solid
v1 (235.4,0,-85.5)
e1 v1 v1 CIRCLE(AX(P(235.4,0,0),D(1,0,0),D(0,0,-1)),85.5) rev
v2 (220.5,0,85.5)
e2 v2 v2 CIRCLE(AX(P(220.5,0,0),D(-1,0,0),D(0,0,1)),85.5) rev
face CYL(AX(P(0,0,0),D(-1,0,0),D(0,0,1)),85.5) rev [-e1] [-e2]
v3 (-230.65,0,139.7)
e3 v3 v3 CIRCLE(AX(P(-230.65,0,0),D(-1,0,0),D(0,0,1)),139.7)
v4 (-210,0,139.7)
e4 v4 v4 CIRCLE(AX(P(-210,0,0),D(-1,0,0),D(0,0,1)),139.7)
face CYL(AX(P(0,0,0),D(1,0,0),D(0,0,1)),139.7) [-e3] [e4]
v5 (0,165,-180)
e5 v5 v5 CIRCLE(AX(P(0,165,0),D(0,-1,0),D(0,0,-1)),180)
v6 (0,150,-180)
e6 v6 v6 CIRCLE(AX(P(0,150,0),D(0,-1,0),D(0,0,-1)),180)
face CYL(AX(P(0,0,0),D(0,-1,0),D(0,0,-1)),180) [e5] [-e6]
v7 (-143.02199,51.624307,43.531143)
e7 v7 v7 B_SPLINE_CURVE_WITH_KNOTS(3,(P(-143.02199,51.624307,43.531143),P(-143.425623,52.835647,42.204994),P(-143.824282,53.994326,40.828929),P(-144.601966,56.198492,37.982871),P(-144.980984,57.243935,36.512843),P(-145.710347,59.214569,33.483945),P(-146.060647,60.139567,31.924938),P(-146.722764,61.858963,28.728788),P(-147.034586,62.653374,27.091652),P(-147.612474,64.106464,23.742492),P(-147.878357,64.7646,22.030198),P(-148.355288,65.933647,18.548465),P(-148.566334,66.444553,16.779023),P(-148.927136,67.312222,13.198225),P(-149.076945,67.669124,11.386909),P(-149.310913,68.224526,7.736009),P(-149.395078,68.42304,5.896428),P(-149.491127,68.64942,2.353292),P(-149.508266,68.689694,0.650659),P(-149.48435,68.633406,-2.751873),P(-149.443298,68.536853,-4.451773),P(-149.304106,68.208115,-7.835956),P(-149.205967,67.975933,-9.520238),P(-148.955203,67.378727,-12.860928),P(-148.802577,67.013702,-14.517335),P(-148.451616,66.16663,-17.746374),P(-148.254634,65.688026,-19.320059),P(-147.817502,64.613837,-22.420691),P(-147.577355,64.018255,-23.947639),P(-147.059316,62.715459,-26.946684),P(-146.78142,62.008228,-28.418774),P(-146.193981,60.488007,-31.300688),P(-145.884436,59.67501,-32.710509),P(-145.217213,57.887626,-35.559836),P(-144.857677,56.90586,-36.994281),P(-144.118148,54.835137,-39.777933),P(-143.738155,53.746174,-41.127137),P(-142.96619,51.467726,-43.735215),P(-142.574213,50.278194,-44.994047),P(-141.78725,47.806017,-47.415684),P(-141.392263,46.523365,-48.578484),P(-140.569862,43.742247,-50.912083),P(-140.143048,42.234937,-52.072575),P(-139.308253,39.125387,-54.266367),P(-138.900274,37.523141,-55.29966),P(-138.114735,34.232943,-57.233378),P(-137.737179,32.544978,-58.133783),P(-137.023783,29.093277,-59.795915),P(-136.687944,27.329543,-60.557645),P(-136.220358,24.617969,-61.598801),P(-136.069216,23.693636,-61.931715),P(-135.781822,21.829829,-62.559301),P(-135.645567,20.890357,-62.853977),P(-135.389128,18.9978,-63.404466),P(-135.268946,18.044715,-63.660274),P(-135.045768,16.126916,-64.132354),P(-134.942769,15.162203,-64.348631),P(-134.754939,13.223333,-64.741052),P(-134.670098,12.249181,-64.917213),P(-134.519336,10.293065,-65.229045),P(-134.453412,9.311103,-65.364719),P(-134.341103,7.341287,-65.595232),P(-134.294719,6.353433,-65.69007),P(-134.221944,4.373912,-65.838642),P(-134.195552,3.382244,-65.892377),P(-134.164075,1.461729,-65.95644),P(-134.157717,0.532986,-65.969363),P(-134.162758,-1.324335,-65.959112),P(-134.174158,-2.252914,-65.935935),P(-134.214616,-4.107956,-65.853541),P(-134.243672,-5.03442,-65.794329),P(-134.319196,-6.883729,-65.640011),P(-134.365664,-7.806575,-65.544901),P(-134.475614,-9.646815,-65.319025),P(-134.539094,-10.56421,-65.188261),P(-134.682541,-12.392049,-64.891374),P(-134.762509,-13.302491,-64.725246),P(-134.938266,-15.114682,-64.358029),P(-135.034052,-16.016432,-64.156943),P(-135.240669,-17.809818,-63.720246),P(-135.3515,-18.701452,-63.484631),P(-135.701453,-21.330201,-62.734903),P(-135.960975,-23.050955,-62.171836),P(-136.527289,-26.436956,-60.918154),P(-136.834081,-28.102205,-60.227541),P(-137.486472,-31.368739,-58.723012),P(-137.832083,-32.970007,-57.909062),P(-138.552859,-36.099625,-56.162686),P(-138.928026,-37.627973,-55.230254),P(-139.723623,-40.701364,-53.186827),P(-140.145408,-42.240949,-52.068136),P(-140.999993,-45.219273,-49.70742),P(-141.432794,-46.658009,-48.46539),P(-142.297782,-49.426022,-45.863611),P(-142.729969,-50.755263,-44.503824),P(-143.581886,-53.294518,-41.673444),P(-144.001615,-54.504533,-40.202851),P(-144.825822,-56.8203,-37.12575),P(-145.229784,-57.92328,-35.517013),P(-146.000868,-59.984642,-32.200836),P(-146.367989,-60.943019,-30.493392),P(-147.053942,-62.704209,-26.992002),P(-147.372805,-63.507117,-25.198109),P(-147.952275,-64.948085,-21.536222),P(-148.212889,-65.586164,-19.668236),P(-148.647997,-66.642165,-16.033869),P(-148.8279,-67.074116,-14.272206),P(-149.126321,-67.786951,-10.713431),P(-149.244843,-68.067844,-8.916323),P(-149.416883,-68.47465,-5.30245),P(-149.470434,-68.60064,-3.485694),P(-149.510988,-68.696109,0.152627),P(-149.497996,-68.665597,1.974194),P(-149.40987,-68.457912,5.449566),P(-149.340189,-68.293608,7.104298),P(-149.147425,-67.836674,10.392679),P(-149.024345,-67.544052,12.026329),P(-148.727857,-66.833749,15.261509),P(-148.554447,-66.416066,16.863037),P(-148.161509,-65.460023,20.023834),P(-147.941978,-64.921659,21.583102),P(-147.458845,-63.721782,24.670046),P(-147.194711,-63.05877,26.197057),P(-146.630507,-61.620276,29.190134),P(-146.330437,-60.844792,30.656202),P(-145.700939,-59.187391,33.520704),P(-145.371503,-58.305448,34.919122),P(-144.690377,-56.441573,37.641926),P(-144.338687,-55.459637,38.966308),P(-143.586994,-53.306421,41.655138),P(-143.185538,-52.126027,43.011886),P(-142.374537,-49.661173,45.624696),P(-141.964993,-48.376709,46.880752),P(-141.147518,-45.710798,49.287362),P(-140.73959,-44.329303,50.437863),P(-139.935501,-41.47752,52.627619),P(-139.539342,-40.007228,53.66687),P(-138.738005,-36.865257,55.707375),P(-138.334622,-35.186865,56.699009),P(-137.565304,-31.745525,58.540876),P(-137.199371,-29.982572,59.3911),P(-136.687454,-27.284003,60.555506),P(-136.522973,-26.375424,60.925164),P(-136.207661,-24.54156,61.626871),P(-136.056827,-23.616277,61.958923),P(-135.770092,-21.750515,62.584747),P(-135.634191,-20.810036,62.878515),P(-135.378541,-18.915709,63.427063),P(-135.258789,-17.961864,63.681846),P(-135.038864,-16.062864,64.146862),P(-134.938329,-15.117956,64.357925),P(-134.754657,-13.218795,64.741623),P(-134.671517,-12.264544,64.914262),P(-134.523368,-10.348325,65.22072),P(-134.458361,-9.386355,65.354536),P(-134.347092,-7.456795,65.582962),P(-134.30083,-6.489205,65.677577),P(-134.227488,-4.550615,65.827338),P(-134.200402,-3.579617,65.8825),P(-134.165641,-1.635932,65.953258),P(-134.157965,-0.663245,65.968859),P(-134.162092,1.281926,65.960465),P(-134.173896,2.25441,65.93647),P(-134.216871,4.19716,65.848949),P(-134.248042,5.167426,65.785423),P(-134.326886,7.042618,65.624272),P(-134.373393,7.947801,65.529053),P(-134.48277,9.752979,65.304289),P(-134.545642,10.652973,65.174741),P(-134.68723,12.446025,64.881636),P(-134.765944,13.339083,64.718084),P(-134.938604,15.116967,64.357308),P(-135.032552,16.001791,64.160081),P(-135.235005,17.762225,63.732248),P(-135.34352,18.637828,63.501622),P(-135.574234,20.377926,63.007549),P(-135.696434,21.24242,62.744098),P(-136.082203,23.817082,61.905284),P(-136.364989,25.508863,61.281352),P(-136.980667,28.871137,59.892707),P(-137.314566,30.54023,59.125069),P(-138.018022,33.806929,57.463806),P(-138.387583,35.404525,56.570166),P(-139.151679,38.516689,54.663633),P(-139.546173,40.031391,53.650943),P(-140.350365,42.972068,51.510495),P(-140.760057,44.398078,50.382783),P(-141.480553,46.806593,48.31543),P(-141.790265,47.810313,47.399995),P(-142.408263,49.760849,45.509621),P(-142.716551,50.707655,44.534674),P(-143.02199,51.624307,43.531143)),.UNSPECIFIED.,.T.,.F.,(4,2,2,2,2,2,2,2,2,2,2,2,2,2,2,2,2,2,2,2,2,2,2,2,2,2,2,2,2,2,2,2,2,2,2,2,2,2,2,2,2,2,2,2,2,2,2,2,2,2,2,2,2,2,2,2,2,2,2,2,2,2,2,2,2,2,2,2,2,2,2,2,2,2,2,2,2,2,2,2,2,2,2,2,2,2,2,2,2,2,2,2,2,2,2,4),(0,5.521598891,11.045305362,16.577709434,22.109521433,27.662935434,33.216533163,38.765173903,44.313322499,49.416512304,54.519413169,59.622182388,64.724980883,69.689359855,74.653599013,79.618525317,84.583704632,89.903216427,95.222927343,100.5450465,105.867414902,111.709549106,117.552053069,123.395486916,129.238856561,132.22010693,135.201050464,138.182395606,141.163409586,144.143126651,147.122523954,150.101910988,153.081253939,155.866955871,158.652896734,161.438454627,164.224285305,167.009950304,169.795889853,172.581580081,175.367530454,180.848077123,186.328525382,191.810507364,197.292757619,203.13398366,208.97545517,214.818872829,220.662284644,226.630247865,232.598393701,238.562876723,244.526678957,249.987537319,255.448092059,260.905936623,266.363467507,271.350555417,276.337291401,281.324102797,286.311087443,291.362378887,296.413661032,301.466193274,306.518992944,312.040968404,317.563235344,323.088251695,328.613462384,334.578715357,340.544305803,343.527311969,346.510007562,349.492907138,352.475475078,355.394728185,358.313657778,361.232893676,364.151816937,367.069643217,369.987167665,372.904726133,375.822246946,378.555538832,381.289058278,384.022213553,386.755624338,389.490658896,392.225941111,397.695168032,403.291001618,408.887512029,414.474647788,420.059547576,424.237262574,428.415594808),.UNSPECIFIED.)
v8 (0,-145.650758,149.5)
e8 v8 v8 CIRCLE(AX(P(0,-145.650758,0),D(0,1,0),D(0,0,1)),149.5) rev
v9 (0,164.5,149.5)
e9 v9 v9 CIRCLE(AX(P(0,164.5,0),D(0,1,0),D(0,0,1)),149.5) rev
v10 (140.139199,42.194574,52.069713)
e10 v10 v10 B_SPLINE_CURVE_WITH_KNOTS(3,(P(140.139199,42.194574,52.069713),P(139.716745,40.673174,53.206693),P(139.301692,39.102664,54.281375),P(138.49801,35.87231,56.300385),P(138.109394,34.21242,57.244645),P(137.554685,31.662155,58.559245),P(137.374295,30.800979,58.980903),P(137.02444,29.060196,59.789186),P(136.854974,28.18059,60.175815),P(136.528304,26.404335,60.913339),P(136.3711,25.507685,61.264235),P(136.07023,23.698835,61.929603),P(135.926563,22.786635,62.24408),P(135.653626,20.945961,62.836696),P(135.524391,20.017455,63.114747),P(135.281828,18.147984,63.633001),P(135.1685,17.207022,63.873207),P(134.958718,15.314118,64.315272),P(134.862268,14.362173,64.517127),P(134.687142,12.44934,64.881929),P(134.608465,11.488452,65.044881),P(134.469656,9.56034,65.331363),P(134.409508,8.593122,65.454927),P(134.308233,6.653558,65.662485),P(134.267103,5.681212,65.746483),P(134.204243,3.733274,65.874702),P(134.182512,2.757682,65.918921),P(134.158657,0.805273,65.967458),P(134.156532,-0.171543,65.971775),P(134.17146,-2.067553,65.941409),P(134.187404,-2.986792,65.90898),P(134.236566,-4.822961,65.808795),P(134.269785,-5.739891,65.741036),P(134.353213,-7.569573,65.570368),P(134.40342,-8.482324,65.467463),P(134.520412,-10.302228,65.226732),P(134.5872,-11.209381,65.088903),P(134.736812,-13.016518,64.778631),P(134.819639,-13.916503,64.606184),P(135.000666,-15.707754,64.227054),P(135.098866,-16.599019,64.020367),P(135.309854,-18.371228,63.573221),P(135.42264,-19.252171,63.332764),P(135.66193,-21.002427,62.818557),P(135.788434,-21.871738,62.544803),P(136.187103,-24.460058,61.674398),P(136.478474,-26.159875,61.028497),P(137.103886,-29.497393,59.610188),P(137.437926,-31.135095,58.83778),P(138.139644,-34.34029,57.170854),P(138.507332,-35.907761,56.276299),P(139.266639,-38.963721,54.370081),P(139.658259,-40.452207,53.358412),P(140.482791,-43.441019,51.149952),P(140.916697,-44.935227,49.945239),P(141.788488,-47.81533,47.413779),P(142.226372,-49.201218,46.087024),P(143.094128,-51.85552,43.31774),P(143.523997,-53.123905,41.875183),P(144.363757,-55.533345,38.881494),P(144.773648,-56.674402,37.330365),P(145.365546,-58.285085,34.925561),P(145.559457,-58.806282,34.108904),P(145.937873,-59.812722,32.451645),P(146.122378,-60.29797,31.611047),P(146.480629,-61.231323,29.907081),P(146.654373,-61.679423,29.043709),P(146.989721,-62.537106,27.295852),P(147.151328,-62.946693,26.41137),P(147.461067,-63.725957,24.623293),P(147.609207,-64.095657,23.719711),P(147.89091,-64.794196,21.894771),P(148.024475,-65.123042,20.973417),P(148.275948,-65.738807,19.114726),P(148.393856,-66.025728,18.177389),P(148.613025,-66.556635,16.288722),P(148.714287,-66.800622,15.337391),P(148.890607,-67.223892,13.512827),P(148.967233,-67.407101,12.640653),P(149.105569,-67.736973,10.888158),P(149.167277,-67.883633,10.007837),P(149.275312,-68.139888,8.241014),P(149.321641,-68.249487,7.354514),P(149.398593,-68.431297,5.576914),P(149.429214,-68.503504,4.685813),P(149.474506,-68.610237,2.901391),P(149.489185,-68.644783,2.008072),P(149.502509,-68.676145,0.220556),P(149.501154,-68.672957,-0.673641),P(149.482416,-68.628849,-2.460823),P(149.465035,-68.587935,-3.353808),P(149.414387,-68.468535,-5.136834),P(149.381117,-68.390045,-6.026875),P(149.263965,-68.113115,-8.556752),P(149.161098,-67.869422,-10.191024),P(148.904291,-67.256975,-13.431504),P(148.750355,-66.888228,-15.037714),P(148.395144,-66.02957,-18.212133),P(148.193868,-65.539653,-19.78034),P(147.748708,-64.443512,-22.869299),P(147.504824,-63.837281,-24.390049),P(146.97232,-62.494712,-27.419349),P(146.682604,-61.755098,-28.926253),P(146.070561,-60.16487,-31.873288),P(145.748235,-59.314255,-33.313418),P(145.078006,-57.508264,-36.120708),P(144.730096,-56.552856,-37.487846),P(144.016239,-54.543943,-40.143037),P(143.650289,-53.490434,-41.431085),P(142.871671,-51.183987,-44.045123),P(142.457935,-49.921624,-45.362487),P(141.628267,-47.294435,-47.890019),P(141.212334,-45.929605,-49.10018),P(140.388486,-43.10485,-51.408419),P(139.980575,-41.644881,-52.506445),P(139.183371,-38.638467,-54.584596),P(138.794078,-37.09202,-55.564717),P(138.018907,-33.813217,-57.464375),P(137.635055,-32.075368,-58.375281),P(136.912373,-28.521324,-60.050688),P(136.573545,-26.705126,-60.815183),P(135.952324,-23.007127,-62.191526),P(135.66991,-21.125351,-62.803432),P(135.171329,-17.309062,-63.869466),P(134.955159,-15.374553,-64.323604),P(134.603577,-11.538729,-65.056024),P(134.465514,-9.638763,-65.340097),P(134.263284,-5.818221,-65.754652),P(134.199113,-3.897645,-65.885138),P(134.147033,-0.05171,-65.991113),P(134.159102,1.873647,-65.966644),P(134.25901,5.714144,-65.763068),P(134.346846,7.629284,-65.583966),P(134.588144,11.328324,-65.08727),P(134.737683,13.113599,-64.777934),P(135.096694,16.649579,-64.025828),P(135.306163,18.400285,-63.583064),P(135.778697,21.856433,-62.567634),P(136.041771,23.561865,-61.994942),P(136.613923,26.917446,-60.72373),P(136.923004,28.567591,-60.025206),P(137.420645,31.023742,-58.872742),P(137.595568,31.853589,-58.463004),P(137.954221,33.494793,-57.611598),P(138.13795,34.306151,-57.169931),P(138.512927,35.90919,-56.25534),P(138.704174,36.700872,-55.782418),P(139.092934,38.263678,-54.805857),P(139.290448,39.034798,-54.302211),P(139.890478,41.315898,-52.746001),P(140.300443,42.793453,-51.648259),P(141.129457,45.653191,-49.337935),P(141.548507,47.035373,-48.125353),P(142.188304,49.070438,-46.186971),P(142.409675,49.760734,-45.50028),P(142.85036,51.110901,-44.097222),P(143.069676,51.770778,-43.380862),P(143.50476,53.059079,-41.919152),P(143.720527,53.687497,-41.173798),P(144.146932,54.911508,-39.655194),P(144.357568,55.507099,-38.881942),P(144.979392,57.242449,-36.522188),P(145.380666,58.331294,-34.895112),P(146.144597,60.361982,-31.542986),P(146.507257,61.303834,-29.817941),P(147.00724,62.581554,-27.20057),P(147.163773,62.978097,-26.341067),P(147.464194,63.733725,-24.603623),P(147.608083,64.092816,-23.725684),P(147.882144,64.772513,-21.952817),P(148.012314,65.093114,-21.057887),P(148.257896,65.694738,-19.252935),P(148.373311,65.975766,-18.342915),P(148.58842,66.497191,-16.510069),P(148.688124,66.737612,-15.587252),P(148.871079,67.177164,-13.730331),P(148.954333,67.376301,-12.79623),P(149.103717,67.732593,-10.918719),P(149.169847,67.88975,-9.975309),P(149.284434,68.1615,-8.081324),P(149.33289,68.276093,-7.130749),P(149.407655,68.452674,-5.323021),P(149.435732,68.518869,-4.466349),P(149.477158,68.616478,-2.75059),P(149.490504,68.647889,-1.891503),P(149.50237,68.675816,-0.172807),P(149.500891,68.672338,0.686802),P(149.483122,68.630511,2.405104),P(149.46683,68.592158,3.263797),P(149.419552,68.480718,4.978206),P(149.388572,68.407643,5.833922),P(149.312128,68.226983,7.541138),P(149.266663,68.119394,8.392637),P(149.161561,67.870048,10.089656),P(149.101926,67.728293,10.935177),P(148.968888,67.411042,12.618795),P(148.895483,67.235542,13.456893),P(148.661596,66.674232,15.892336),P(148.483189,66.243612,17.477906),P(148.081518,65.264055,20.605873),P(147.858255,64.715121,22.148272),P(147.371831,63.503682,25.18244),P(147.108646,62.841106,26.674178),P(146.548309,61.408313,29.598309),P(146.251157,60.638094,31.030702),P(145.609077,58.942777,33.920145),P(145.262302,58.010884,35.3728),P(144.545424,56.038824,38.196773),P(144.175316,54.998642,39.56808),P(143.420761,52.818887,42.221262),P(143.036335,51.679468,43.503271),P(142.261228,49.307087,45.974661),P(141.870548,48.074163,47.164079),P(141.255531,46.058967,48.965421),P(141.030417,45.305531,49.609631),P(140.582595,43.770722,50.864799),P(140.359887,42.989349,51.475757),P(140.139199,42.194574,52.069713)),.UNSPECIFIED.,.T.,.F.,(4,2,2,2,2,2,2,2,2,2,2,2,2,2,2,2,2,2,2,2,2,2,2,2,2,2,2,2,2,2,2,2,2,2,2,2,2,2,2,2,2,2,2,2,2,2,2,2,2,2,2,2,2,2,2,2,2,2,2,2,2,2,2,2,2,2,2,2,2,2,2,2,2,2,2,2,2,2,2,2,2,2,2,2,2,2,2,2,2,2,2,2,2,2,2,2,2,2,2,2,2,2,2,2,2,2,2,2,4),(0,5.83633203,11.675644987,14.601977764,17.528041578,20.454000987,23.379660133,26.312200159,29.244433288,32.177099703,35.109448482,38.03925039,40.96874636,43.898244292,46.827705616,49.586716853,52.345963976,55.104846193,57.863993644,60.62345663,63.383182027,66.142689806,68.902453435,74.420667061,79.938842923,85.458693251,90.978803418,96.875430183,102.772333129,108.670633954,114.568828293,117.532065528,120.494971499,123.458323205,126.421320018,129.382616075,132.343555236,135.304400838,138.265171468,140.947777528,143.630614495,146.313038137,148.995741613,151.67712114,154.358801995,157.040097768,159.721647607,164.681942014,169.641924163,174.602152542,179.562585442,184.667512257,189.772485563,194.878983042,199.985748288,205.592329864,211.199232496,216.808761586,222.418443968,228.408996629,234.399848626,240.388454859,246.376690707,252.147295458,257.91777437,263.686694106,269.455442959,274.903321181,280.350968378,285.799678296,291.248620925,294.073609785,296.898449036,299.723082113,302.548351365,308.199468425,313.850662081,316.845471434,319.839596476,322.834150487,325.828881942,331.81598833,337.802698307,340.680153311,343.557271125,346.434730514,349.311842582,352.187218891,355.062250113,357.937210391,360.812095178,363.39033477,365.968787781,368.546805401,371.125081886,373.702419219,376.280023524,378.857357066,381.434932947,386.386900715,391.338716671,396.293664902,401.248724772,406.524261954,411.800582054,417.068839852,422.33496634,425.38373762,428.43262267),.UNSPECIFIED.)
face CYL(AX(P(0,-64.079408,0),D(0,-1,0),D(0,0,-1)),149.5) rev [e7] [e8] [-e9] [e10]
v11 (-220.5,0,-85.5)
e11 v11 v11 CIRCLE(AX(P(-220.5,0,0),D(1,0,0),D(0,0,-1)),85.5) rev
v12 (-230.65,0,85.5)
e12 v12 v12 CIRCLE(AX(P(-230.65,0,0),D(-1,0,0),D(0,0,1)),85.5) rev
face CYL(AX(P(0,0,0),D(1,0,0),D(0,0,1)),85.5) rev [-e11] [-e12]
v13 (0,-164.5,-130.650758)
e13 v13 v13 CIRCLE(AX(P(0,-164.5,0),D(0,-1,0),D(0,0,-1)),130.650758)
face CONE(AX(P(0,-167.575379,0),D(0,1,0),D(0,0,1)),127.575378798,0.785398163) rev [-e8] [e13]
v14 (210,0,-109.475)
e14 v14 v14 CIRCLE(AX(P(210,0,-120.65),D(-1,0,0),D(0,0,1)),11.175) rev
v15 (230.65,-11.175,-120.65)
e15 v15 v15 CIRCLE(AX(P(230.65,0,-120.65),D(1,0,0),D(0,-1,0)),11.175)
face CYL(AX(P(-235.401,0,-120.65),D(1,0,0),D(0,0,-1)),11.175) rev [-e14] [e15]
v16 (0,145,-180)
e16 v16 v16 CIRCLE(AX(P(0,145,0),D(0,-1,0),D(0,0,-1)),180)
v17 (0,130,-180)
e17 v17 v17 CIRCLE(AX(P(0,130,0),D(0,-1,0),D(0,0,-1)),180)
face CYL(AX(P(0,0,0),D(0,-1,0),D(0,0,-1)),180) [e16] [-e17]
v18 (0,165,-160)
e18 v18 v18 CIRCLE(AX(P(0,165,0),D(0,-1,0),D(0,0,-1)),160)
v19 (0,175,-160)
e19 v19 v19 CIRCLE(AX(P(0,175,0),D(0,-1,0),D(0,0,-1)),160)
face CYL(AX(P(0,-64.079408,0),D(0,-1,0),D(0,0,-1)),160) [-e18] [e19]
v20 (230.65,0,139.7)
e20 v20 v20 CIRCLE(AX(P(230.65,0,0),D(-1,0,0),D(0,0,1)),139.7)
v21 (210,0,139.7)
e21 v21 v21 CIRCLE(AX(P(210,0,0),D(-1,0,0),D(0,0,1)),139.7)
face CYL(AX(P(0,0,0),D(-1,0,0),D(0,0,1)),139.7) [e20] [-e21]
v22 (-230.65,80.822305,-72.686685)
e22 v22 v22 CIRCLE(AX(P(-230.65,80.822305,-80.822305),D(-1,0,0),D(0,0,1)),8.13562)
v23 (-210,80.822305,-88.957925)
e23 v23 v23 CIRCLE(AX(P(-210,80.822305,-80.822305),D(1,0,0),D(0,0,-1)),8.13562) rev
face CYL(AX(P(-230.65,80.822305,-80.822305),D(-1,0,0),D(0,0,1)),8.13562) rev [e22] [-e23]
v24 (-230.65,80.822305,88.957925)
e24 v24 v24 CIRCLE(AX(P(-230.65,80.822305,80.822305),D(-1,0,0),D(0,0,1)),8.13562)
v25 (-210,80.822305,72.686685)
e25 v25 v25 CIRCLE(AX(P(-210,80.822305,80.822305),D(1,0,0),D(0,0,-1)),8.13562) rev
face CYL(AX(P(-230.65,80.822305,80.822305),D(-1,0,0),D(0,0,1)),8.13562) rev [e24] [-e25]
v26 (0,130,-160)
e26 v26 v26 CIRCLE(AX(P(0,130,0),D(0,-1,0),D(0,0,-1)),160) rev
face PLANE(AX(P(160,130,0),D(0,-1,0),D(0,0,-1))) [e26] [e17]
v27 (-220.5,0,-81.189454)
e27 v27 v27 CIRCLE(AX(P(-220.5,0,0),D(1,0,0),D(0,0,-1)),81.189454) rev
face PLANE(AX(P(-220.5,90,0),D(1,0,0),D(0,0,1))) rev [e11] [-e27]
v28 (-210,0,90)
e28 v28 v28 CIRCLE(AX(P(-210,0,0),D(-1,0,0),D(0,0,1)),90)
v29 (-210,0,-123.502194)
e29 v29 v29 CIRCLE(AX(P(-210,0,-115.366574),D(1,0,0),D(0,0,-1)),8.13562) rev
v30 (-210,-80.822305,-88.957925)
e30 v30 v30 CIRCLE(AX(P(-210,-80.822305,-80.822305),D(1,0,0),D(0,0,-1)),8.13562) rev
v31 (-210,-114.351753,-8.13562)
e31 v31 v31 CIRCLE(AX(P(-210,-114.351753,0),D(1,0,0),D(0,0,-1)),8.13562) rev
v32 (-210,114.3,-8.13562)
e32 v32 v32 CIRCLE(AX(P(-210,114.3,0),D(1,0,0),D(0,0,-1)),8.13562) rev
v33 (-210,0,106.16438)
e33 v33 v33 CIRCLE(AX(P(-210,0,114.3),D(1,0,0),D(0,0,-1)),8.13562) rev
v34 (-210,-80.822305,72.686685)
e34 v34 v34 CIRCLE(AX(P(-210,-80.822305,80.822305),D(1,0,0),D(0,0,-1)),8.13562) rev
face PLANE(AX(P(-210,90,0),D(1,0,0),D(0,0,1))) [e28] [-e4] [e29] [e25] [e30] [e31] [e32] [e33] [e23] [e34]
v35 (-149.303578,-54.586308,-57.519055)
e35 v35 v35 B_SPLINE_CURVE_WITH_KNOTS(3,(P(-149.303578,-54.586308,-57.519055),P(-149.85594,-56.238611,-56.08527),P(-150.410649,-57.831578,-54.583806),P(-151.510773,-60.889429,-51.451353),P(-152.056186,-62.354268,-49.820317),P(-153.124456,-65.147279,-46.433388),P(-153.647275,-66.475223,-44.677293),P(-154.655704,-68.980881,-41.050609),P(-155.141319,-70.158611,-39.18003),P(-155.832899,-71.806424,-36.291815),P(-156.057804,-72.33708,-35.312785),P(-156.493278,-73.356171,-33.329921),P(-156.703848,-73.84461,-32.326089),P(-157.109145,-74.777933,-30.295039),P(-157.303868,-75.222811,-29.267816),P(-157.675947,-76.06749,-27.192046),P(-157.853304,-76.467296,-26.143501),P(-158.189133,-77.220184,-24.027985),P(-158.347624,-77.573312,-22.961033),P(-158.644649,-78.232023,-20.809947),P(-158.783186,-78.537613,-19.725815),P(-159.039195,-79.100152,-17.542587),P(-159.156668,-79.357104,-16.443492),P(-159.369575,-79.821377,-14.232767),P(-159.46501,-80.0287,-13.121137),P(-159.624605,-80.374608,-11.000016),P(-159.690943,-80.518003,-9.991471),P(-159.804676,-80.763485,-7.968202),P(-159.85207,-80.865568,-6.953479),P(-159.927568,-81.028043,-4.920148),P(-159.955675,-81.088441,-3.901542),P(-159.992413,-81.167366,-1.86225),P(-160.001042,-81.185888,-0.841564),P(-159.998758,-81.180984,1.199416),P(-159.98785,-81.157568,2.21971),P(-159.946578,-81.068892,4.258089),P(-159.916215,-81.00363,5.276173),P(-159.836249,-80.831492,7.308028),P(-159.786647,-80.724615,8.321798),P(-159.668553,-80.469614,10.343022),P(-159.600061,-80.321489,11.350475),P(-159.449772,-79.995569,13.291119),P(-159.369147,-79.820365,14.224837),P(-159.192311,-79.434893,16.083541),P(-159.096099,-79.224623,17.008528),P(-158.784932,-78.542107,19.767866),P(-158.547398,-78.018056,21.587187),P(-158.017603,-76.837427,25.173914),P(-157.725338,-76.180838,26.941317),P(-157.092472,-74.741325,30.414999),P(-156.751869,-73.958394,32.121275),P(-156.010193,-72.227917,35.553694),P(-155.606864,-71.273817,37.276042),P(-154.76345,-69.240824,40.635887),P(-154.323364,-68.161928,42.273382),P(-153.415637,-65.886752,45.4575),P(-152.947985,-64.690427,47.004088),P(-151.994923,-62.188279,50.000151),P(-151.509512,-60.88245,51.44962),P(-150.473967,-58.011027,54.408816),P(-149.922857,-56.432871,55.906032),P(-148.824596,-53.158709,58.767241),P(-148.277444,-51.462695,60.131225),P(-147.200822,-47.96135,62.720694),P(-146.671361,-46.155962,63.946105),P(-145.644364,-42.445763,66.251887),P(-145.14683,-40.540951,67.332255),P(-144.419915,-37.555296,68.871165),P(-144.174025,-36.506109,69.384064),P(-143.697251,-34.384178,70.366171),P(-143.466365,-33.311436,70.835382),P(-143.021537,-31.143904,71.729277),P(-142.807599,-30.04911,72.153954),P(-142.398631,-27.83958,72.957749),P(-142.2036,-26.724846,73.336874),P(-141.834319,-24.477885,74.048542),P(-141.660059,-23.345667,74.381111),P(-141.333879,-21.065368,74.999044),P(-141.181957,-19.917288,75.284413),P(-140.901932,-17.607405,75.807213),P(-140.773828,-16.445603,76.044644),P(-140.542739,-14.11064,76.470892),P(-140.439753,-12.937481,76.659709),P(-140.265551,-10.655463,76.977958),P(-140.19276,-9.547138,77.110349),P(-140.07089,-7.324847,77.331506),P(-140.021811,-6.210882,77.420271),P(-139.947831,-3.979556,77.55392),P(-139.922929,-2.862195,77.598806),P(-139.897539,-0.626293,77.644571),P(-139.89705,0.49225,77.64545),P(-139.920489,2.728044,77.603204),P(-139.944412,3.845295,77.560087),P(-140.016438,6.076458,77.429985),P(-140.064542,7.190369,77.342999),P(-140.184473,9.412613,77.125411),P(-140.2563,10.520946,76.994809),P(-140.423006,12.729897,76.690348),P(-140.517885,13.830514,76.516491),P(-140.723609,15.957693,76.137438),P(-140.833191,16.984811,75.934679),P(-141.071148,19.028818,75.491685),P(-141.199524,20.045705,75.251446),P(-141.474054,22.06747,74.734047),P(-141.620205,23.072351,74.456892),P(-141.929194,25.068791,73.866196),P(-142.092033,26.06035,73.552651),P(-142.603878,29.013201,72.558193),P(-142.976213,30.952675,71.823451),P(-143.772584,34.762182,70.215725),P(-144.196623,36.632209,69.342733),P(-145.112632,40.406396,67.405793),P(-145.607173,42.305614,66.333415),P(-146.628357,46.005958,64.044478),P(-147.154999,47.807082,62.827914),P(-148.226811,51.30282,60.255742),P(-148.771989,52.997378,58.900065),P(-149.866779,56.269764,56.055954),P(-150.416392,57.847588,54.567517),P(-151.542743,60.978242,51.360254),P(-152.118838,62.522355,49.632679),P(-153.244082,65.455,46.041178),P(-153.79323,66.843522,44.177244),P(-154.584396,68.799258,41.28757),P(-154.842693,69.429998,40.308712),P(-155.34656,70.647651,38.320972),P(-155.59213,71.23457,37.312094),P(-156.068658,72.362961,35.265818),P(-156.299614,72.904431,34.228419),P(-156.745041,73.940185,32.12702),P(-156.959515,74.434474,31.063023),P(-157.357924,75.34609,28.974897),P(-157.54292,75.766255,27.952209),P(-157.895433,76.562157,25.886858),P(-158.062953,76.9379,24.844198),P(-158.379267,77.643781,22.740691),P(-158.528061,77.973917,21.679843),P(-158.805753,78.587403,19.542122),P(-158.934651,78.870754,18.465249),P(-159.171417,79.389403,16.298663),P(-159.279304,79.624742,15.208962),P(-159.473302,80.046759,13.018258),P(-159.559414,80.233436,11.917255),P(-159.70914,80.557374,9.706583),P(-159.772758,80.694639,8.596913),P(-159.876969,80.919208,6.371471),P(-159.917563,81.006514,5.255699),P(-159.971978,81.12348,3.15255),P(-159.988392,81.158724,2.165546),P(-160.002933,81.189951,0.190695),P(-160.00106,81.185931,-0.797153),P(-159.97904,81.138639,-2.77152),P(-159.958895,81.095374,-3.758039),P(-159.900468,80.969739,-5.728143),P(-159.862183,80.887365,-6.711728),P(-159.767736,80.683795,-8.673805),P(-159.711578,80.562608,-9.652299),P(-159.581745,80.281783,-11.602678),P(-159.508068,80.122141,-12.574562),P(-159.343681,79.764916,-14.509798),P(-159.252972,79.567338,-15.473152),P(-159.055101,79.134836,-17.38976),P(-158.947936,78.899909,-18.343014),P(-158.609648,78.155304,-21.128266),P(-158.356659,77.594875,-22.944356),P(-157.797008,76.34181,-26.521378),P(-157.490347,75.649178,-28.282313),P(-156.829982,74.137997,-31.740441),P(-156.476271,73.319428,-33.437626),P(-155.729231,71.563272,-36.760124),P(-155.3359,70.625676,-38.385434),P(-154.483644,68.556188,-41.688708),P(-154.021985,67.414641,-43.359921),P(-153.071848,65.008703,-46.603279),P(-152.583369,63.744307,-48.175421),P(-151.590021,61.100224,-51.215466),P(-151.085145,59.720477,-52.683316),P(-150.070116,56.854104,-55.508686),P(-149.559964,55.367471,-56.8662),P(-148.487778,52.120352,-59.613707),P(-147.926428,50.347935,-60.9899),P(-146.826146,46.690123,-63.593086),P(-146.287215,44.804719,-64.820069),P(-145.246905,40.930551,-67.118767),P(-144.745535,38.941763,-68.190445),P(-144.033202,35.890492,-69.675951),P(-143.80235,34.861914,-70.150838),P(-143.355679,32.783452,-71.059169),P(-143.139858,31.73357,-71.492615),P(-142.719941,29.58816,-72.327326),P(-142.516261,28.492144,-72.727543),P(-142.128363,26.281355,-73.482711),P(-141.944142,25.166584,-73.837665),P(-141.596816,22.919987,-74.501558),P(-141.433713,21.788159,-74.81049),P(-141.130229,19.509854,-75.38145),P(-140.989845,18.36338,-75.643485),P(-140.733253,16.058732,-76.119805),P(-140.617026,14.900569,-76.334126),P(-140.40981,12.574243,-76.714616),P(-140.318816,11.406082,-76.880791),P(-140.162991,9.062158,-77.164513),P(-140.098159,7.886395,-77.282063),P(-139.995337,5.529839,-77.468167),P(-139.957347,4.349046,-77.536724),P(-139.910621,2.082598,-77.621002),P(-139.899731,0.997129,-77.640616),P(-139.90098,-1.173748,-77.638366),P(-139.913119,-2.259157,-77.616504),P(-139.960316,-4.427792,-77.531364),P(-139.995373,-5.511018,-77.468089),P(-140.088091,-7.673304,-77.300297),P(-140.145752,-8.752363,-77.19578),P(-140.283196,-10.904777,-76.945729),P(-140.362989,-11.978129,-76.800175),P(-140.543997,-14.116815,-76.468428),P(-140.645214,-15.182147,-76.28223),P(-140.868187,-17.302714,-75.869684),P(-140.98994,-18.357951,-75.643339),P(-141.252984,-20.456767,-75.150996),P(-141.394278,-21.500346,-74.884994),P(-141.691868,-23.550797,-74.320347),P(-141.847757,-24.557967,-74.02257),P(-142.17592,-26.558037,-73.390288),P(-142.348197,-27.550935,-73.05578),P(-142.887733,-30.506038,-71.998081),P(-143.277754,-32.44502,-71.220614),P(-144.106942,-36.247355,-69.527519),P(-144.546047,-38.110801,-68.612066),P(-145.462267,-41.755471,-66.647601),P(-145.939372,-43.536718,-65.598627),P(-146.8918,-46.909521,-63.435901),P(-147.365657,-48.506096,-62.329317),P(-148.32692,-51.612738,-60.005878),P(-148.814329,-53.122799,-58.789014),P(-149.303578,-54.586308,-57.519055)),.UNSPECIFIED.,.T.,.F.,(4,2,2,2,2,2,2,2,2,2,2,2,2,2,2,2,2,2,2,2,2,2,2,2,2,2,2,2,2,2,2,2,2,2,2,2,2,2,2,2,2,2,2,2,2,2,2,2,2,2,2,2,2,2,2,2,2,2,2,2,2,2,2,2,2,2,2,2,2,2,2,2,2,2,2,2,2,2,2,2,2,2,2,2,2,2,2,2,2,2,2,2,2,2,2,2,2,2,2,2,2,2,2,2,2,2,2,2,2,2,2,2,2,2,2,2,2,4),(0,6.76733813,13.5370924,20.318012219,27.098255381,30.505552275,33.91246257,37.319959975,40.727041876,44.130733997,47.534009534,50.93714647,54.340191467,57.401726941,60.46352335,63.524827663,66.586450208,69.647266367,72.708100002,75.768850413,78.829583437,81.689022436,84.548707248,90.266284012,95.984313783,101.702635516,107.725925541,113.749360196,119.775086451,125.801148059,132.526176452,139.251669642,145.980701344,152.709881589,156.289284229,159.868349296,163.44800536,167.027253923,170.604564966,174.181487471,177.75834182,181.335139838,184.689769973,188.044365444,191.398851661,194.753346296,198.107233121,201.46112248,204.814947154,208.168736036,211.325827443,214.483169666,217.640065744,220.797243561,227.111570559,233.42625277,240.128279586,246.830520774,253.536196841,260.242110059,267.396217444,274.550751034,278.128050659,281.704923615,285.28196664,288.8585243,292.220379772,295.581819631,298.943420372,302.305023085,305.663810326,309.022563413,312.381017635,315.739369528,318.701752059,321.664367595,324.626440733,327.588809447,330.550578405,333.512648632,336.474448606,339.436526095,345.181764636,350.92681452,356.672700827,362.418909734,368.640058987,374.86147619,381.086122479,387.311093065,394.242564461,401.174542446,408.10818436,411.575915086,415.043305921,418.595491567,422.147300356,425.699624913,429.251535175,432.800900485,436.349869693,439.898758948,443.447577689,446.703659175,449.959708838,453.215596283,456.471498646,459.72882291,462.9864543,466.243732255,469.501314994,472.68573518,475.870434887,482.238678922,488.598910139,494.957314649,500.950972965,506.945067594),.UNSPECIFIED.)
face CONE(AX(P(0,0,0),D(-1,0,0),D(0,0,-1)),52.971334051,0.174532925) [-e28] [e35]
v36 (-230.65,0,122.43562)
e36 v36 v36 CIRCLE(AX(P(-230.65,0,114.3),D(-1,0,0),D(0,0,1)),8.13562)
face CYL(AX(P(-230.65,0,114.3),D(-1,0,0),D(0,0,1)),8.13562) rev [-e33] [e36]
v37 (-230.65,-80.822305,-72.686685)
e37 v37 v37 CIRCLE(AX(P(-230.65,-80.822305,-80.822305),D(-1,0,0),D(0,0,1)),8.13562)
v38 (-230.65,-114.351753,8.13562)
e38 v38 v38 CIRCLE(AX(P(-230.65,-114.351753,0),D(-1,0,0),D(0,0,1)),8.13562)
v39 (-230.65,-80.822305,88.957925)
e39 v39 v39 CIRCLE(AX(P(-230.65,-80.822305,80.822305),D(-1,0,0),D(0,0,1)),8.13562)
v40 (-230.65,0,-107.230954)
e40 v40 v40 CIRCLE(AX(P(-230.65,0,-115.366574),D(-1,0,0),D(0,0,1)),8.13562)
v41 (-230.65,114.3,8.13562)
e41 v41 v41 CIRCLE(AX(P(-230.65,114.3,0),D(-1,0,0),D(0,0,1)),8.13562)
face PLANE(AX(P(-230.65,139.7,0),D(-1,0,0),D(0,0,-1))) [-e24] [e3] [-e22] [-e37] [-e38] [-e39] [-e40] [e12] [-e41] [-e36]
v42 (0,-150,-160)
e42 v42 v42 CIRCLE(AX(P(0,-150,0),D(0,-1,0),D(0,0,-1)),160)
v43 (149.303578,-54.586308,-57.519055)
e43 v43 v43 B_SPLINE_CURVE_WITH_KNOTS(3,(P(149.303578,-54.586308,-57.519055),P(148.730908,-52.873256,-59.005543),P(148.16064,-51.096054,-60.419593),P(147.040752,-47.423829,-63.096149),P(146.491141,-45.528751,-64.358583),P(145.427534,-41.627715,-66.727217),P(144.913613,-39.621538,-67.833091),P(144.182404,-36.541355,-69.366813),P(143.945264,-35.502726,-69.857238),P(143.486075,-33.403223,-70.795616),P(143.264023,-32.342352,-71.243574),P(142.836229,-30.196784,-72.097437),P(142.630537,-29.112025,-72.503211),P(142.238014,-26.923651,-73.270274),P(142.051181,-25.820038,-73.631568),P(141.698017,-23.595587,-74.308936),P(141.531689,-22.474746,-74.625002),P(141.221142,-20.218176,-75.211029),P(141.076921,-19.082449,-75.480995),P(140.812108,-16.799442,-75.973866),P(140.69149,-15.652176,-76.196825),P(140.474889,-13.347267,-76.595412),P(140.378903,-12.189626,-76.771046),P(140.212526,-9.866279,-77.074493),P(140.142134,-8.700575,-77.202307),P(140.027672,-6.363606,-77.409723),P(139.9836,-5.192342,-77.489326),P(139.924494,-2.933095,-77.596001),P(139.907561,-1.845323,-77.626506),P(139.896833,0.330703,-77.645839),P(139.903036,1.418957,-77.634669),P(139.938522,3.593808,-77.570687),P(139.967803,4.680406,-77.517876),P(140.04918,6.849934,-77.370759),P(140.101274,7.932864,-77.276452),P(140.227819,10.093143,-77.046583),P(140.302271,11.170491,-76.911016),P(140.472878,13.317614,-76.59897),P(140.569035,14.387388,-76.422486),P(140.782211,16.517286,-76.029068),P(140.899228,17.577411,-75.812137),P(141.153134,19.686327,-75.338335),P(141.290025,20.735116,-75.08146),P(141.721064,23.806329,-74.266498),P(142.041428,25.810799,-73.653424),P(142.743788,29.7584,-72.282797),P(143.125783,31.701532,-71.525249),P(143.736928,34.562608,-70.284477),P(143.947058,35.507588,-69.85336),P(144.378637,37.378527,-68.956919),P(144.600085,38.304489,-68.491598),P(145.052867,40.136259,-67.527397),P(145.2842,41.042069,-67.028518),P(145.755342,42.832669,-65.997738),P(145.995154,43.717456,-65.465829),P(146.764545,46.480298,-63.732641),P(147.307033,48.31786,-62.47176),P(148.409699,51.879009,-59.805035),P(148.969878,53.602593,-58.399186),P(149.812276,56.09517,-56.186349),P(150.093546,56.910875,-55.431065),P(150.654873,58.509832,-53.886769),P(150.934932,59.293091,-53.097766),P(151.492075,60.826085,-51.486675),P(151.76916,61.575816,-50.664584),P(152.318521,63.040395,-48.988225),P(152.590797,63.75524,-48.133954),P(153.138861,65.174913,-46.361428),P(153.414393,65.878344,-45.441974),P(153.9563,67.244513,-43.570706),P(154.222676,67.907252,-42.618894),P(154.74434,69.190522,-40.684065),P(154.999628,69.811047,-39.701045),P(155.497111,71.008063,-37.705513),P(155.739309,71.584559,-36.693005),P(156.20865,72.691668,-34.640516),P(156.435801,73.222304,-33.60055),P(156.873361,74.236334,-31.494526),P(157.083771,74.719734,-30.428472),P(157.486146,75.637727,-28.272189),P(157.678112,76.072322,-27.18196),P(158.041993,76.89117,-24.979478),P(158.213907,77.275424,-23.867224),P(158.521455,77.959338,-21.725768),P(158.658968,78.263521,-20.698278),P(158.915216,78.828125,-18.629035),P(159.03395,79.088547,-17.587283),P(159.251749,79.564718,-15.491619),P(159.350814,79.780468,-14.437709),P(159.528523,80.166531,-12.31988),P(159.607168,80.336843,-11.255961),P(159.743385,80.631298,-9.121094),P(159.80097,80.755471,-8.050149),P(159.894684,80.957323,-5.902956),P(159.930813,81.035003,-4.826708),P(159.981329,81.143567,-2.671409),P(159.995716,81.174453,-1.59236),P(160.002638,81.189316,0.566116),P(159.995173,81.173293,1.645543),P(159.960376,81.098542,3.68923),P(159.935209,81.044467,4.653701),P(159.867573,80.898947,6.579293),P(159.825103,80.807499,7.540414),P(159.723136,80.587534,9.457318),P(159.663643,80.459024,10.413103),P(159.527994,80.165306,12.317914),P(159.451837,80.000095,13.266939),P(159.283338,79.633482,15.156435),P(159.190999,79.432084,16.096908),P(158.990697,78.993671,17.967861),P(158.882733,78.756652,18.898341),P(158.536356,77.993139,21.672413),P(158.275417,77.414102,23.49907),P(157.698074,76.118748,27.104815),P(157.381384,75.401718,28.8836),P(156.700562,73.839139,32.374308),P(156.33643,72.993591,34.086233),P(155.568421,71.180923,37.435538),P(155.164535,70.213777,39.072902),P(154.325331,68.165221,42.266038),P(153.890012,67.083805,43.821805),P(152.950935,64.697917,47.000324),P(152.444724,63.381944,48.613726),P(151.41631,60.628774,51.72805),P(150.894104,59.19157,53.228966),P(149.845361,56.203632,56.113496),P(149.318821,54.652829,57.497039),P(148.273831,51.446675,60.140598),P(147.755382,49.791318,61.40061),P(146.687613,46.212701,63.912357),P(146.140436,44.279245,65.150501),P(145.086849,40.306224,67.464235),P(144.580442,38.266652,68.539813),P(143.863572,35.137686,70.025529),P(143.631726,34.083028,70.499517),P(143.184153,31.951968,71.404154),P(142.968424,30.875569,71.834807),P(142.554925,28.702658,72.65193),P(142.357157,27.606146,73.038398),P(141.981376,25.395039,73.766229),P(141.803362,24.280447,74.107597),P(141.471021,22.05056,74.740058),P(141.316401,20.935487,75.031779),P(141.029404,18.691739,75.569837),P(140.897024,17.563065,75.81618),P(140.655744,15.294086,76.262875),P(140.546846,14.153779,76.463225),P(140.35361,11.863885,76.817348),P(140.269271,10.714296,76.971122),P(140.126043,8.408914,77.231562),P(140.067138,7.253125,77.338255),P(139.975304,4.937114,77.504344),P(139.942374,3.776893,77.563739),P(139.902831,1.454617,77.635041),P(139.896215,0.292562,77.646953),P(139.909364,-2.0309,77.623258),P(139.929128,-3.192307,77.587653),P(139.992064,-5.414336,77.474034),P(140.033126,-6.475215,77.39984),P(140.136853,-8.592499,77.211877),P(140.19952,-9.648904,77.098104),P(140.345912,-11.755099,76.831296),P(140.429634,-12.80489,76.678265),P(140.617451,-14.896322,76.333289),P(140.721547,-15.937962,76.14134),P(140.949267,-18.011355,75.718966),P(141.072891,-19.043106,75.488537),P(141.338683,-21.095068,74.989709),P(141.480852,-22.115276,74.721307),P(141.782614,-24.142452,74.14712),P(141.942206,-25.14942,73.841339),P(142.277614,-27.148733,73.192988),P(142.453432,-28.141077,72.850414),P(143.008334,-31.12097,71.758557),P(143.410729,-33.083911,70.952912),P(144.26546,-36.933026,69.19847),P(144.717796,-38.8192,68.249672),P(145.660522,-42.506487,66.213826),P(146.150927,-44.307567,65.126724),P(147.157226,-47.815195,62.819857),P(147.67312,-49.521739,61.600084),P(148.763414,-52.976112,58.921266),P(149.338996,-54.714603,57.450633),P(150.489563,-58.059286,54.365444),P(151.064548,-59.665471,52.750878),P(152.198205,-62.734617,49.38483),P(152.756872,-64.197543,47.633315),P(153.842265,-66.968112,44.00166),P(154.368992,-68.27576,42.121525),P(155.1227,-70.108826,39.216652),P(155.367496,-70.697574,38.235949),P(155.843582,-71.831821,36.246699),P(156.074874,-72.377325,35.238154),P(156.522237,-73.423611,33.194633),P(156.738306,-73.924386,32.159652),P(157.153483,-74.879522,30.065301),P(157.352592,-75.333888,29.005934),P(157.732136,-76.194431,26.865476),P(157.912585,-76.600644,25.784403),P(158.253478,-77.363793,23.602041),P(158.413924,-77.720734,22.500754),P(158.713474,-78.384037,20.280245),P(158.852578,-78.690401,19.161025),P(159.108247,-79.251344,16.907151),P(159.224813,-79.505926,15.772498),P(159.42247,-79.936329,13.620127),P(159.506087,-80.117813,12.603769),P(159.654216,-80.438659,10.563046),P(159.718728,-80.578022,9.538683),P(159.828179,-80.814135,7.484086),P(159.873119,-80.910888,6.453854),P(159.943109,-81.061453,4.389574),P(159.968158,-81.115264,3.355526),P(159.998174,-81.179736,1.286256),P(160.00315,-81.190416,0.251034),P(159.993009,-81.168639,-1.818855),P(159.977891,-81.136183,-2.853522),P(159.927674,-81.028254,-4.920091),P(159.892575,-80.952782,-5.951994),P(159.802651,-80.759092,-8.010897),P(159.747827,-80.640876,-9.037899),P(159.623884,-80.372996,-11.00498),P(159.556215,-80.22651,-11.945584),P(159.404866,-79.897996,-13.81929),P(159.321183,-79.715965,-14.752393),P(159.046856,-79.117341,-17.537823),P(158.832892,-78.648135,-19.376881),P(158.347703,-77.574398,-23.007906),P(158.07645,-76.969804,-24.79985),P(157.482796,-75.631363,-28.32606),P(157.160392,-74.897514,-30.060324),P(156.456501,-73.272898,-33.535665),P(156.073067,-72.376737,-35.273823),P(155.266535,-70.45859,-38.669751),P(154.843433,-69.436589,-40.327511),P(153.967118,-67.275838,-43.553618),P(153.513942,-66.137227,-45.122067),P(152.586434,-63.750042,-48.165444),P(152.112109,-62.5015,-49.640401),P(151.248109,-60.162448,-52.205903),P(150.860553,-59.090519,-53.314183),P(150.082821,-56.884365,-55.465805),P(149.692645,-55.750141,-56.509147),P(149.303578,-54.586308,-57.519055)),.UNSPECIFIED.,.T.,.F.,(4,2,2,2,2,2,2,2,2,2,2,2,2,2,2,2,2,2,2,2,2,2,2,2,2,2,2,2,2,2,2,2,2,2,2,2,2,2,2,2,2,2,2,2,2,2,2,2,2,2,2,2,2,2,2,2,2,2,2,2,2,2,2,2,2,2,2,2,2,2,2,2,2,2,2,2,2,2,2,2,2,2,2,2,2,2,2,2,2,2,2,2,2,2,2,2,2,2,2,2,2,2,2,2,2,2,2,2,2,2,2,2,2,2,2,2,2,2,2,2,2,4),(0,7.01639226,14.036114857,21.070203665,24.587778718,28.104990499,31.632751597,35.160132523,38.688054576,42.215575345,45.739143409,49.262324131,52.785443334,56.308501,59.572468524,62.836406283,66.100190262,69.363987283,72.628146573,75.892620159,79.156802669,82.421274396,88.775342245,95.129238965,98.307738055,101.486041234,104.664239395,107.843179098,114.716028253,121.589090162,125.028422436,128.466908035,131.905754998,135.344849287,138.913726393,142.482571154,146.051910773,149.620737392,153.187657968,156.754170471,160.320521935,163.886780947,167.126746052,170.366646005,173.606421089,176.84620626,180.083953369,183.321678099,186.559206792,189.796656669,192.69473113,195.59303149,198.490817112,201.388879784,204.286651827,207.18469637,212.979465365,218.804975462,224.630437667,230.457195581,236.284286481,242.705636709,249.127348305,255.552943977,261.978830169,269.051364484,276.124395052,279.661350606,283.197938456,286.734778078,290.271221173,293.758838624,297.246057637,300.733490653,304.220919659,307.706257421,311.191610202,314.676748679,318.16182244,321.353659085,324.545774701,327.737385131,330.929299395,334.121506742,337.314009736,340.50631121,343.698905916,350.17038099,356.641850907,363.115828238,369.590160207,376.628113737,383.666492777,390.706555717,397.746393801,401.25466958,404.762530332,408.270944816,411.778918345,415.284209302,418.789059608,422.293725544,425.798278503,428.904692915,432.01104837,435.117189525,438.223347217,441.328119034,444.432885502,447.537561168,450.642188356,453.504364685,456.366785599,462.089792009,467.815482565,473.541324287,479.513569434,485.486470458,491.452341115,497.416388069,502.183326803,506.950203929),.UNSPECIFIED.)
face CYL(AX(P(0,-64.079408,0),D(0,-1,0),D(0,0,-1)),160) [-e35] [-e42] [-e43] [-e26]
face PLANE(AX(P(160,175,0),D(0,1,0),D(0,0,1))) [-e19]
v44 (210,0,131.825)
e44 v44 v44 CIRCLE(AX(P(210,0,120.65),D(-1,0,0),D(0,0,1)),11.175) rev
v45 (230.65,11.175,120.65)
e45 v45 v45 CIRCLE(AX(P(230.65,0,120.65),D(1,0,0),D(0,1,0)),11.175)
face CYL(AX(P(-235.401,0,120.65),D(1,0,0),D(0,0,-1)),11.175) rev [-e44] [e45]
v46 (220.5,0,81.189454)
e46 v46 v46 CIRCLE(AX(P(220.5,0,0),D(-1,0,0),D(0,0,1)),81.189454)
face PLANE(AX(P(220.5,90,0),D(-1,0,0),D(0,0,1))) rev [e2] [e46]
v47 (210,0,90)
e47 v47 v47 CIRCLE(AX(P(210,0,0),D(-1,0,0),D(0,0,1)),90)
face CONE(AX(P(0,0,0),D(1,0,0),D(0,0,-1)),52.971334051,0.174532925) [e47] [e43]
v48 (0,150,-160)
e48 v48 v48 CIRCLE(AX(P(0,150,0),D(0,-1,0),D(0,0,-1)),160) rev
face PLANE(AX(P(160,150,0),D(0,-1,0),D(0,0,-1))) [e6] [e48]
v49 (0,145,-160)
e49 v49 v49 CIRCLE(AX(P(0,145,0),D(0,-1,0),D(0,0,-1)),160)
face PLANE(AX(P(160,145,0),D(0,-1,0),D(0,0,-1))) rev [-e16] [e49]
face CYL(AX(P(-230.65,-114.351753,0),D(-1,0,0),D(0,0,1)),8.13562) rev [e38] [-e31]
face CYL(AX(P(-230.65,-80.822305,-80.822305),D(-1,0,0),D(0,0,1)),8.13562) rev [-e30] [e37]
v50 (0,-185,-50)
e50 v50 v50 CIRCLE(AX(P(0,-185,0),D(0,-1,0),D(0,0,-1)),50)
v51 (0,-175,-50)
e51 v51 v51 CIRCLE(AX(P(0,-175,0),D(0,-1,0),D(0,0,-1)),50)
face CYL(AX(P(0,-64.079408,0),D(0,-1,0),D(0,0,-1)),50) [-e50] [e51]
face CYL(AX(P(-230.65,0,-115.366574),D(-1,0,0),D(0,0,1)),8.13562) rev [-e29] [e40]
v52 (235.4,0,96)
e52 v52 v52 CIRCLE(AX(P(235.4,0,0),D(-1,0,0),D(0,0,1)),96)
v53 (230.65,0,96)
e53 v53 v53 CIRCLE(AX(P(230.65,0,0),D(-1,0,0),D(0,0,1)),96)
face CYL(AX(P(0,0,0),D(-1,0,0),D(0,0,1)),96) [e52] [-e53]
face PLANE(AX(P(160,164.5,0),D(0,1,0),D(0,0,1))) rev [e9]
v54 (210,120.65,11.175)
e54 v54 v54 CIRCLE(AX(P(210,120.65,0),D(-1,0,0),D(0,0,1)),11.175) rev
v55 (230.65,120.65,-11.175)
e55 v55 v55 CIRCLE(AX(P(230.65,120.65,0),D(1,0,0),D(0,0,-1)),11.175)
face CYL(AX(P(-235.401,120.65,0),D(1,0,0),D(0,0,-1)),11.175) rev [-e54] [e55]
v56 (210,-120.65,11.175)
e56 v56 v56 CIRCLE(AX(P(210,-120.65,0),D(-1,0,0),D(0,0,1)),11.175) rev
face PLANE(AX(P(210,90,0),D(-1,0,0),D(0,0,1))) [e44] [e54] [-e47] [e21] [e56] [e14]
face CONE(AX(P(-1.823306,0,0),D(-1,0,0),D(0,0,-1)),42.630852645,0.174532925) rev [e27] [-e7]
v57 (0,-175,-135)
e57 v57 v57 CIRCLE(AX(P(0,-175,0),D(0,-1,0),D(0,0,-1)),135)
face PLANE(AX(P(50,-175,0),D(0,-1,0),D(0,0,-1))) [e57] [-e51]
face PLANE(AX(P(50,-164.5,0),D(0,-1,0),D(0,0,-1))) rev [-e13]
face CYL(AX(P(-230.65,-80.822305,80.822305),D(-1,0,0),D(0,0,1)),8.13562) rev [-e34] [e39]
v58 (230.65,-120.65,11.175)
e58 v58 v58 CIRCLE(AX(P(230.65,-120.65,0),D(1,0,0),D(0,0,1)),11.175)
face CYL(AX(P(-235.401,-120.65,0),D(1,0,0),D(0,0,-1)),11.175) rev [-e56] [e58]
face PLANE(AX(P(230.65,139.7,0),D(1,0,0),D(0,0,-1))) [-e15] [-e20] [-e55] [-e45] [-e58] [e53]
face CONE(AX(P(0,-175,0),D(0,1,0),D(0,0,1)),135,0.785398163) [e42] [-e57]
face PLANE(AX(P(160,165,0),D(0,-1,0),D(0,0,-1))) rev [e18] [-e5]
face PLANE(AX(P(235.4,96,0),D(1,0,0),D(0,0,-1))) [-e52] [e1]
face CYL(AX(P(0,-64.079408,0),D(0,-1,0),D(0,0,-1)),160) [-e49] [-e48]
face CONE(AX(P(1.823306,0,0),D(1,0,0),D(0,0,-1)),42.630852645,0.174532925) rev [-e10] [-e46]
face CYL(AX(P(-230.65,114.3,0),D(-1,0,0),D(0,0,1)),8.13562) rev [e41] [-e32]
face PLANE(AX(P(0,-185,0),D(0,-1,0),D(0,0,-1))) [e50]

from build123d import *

# Parameters (mm, degrees)
SKETCH2_W                   = 20
SKETCH2_H                   = 15
SHELL1_START                = -39.5000001
SHELL1_OUTLINE_R            = 85.5
SHELL1_DEPTH                = 79.0000001
SHELL1_START_2              = -235.4
SHELL1_2_OUTLINE_R          = 85.5
SHELL1_2_DEPTH              = 14.9
SHELL1_START_3              = 220.5
SHELL1_3_OUTLINE_R          = 85.5
SHELL1_3_DEPTH              = 14.9
SHELL1_START_4              = -145.650757695
SHELL1_4_OUTLINE_R          = 149.5
SHELL1_4_DEPTH              = 310.150757695
SHELL1_START_5              = -174.5
SHELL1_5_OUTLINE_R          = 39.5
SHELL1_5_DEPTH              = 89
CUT_EXTRUDE1_REACH          = 534.755
SKETCH5_R                   = 11.175
CIRPATTERN1_COUNT           = 4
SKETCH15_R                  = 96
CUT_EXTRUDE4_DEPTH          = 4.75
SKETCH14_R                  = 39.5
EXTRUDE2_DEPTH              = 10
F_5_8_CLEARANCE_HOLE5_D     = 16.27124
F_5_8_CLEARANCE_HOLE5_DEPTH = 20.65


with BuildPart() as part:
    # Sketch1 → Base-Revolve (revolve)
    with BuildSketch(Plane.XY, mode=Mode.PRIVATE) as base_revolve_sk:
        Polygon((0, -185), (50, -185), (50, -175), (135, -175), (160, -150), (160, 175), (0, 175), align=None)
    revolve(base_revolve_sk.sketch.rotate(Axis((0, -64.079408138, 0), (0, 1, 0)), 90), axis=Axis((0, -64.079408138, 0), (0, 1, 0)))

    # Sketch2 → Boss-Revolve1 (revolve)
    with BuildSketch(Plane.XY, mode=Mode.PRIVATE) as boss_revolve1_sk:
        with Locations((170, 157.5)):
            Rectangle(SKETCH2_W, SKETCH2_H)
        with Locations((170, 137.5)):
            Rectangle(SKETCH2_W, SKETCH2_H)
    revolve(boss_revolve1_sk.sketch.rotate(Axis((0, 0, 0), (0, 1, 0)), 90), axis=Axis((0, 0, 0), (0, 1, 0)))

    # Sketch3 → Boss-Revolve2 (revolve)
    with BuildSketch(Plane.XY, mode=Mode.PRIVATE) as boss_revolve2_sk:
        Polygon((0, 0), (0, 52.971334051), (210, 90), (210, 139.7), (230.65, 139.7), (230.65, 96), (235.4, 96), (235.4, 0), align=None)
    boss_revolve2 = revolve(boss_revolve2_sk.sketch.rotate(Axis((0, 0, 0), (1, 0, 0)), 90), axis=Axis((0, 0, 0), (1, 0, 0)))

    # Mirror1: Boss-Revolve2 across plane
    add(boss_revolve2.mirror(Plane(origin=(0, 0, 0), x_dir=(0, 0, 1), z_dir=(1, 0, 0))))

    # Shell1: read off the stored shape, not the designer's step
    # Shell1 outline → Shell1 (cut)
    with BuildSketch(Plane.YZ.offset(SHELL1_START)):
        Circle(SHELL1_OUTLINE_R)
    extrude(amount=SHELL1_DEPTH, mode=Mode.SUBTRACT)

    # Shell1 2 outline → Shell1 2 (cut)
    with BuildSketch(Plane.YZ.offset(SHELL1_START_2)):
        Circle(SHELL1_2_OUTLINE_R)
    extrude(amount=SHELL1_2_DEPTH, mode=Mode.SUBTRACT)

    # Shell1 3 outline → Shell1 3 (cut)
    with BuildSketch(Plane.YZ.offset(SHELL1_START_3)):
        Circle(SHELL1_3_OUTLINE_R)
    extrude(amount=SHELL1_3_DEPTH, mode=Mode.SUBTRACT)

    # Shell1 4 outline → Shell1 4 (cut)
    with BuildSketch(Plane(origin=(0, 0, 0), x_dir=(1, 0, 0), z_dir=(0, 1, 0)).offset(SHELL1_START_4)):
        Circle(SHELL1_4_OUTLINE_R)
    extrude(amount=SHELL1_4_DEPTH, mode=Mode.SUBTRACT)

    # Shell1 5 outline → Shell1 5 (cut)
    with BuildSketch(Plane(origin=(0, 0, 0), x_dir=(1, 0, 0), z_dir=(0, 1, 0)).offset(SHELL1_START_5)):
        Circle(SHELL1_5_OUTLINE_R)
    extrude(amount=SHELL1_5_DEPTH, mode=Mode.SUBTRACT)

    # Shell1 6: loft between two sections, ruled curve by curve
    shell1_6_from = [
        Edge.make_three_point_arc((0, -164.5, 130.650757595), (130.650757595, -164.5, 0), (0, -164.5, -130.650757595)),
        Edge.make_three_point_arc((0, -164.5, -130.650757595), (-130.650757595, -164.5, 0), (0, -164.5, 130.650757595)),
    ]
    shell1_6_to = [
        Edge.make_three_point_arc((0, -145.650757595, 149.5), (149.5, -145.650757595, 0), (0, -145.650757595, -149.5)),
        Edge.make_three_point_arc((0, -145.650757595, -149.5), (-149.5, -145.650757595, 0), (0, -145.650757595, 149.5)),
    ]
    shell1_6 = Solid(Shell([*[Face.make_surface_from_curves(shell1_6_from[k], shell1_6_to[k]) for k in range(2)], Face(Wire(shell1_6_from)), Face(Wire(shell1_6_to))]))
    add(shell1_6, mode=Mode.SUBTRACT)

    # Shell1 7: loft between two sections, ruled curve by curve
    shell1_7_from = [
        Edge.make_three_point_arc((134.158642782, 41.530655606, 51.250412113), (134.158642782, -51.250412113, 41.530655606), (134.158642782, -41.530655606, -51.250412113)),
        Edge.make_three_point_arc((134.158642782, -41.530655606, -51.250412113), (134.158642782, 51.250412113, -41.530655606), (134.158642782, 41.530655606, 51.250412113)),
    ]
    shell1_7_to = [
        Edge.make_three_point_arc((220.5, 51.115651267, 63.078662127), (220.5, -63.078662127, 51.115651267), (220.5, -51.115651267, -63.078662127)),
        Edge.make_three_point_arc((220.5, -51.115651267, -63.078662127), (220.5, 63.078662127, -51.115651267), (220.5, 51.115651267, 63.078662127)),
    ]
    shell1_7 = Solid(Shell([*[Face.make_surface_from_curves(shell1_7_from[k], shell1_7_to[k]) for k in range(2)], Face(Wire(shell1_7_from)), Face(Wire(shell1_7_to))]))
    add(shell1_7, mode=Mode.SUBTRACT)

    # Shell1 8: loft between two sections, ruled curve by curve
    shell1_8_from = [
        Edge.make_three_point_arc((-134.158707207, 0, -65.965154404), (-134.158707207, -65.965154404, 0), (-134.158707207, 0, 65.965154404)),
        Edge.make_three_point_arc((-134.158707207, 0, 65.965154404), (-134.158707207, 65.965154404, 0), (-134.158707207, 0, -65.965154404)),
    ]
    shell1_8_to = [
        Edge.make_three_point_arc((-220.5, 0, -81.189453873), (-220.5, -81.189453873, 0), (-220.5, 0, 81.189453873)),
        Edge.make_three_point_arc((-220.5, 0, 81.189453873), (-220.5, 81.189453873, 0), (-220.5, 0, -81.189453873)),
    ]
    shell1_8 = Solid(Shell([*[Face.make_surface_from_curves(shell1_8_from[k], shell1_8_to[k]) for k in range(2)], Face(Wire(shell1_8_from)), Face(Wire(shell1_8_to))]))
    add(shell1_8, mode=Mode.SUBTRACT)

    # Sketch5 → Cut-Extrude1 (cut, up to next)
    with BuildSketch(Plane(origin=(230.65, 0, 0), x_dir=(0, 0, -1), z_dir=(1, 0, 0)), mode=Mode.PRIVATE) as cut_extrude1_sk1:
        with Locations((0, 120.65)):
            Circle(SKETCH5_R)
    cut_extrude1_tool1 = extrude(cut_extrude1_sk1.sketch, amount=-CUT_EXTRUDE1_REACH, mode=Mode.PRIVATE) & part.part
    cut_extrude1 = cut_extrude1_tool1.solids().sort_by_distance((230.65, 120.65, 0))[0]
    add(cut_extrude1, mode=Mode.SUBTRACT)

    # CirPattern1: Cut-Extrude1 ×4 about axis
    cirpattern1_axis = Axis((0, 0, 0), (1, 0, 0))
    for i in range(1, CIRPATTERN1_COUNT):
        add(cut_extrude1.rotate(cirpattern1_axis, i * 360 / CIRPATTERN1_COUNT), mode=Mode.SUBTRACT)

    # Sketch15 → Cut-Extrude4 (cut)
    with BuildSketch(Plane.ZY.offset(230.65)):
        Circle(SKETCH15_R)
    extrude(amount=CUT_EXTRUDE4_DEPTH, mode=Mode.SUBTRACT)

    # Sketch14 → Extrude2 (add)
    with BuildSketch(Plane(origin=(0, -174.5, 0), x_dir=(1, 0, 0), z_dir=(0, 1, 0))):
        Circle(SKETCH14_R)
    extrude(amount=EXTRUDE2_DEPTH)

    # 5/8 Clearance Hole5
    with Locations(Plane(origin=(-230.65, -86.94526051, 61.229912904), x_dir=(0, 0, 1), z_dir=(-1, 0, 0))):
        with Locations((-61.229912904, 201.24526051), (-176.596487394, 86.94526051), (-142.052217993, 167.767565599), (19.592392186, 167.767565599), (53.070087096, 86.94526051), (19.592392186, 6.12295542), (-61.229912904, -27.406492985), (-142.052217993, 6.12295542)):
            Hole(F_5_8_CLEARANCE_HOLE5_D / 2, depth=F_5_8_CLEARANCE_HOLE5_DEPTH)


solid = part.part
